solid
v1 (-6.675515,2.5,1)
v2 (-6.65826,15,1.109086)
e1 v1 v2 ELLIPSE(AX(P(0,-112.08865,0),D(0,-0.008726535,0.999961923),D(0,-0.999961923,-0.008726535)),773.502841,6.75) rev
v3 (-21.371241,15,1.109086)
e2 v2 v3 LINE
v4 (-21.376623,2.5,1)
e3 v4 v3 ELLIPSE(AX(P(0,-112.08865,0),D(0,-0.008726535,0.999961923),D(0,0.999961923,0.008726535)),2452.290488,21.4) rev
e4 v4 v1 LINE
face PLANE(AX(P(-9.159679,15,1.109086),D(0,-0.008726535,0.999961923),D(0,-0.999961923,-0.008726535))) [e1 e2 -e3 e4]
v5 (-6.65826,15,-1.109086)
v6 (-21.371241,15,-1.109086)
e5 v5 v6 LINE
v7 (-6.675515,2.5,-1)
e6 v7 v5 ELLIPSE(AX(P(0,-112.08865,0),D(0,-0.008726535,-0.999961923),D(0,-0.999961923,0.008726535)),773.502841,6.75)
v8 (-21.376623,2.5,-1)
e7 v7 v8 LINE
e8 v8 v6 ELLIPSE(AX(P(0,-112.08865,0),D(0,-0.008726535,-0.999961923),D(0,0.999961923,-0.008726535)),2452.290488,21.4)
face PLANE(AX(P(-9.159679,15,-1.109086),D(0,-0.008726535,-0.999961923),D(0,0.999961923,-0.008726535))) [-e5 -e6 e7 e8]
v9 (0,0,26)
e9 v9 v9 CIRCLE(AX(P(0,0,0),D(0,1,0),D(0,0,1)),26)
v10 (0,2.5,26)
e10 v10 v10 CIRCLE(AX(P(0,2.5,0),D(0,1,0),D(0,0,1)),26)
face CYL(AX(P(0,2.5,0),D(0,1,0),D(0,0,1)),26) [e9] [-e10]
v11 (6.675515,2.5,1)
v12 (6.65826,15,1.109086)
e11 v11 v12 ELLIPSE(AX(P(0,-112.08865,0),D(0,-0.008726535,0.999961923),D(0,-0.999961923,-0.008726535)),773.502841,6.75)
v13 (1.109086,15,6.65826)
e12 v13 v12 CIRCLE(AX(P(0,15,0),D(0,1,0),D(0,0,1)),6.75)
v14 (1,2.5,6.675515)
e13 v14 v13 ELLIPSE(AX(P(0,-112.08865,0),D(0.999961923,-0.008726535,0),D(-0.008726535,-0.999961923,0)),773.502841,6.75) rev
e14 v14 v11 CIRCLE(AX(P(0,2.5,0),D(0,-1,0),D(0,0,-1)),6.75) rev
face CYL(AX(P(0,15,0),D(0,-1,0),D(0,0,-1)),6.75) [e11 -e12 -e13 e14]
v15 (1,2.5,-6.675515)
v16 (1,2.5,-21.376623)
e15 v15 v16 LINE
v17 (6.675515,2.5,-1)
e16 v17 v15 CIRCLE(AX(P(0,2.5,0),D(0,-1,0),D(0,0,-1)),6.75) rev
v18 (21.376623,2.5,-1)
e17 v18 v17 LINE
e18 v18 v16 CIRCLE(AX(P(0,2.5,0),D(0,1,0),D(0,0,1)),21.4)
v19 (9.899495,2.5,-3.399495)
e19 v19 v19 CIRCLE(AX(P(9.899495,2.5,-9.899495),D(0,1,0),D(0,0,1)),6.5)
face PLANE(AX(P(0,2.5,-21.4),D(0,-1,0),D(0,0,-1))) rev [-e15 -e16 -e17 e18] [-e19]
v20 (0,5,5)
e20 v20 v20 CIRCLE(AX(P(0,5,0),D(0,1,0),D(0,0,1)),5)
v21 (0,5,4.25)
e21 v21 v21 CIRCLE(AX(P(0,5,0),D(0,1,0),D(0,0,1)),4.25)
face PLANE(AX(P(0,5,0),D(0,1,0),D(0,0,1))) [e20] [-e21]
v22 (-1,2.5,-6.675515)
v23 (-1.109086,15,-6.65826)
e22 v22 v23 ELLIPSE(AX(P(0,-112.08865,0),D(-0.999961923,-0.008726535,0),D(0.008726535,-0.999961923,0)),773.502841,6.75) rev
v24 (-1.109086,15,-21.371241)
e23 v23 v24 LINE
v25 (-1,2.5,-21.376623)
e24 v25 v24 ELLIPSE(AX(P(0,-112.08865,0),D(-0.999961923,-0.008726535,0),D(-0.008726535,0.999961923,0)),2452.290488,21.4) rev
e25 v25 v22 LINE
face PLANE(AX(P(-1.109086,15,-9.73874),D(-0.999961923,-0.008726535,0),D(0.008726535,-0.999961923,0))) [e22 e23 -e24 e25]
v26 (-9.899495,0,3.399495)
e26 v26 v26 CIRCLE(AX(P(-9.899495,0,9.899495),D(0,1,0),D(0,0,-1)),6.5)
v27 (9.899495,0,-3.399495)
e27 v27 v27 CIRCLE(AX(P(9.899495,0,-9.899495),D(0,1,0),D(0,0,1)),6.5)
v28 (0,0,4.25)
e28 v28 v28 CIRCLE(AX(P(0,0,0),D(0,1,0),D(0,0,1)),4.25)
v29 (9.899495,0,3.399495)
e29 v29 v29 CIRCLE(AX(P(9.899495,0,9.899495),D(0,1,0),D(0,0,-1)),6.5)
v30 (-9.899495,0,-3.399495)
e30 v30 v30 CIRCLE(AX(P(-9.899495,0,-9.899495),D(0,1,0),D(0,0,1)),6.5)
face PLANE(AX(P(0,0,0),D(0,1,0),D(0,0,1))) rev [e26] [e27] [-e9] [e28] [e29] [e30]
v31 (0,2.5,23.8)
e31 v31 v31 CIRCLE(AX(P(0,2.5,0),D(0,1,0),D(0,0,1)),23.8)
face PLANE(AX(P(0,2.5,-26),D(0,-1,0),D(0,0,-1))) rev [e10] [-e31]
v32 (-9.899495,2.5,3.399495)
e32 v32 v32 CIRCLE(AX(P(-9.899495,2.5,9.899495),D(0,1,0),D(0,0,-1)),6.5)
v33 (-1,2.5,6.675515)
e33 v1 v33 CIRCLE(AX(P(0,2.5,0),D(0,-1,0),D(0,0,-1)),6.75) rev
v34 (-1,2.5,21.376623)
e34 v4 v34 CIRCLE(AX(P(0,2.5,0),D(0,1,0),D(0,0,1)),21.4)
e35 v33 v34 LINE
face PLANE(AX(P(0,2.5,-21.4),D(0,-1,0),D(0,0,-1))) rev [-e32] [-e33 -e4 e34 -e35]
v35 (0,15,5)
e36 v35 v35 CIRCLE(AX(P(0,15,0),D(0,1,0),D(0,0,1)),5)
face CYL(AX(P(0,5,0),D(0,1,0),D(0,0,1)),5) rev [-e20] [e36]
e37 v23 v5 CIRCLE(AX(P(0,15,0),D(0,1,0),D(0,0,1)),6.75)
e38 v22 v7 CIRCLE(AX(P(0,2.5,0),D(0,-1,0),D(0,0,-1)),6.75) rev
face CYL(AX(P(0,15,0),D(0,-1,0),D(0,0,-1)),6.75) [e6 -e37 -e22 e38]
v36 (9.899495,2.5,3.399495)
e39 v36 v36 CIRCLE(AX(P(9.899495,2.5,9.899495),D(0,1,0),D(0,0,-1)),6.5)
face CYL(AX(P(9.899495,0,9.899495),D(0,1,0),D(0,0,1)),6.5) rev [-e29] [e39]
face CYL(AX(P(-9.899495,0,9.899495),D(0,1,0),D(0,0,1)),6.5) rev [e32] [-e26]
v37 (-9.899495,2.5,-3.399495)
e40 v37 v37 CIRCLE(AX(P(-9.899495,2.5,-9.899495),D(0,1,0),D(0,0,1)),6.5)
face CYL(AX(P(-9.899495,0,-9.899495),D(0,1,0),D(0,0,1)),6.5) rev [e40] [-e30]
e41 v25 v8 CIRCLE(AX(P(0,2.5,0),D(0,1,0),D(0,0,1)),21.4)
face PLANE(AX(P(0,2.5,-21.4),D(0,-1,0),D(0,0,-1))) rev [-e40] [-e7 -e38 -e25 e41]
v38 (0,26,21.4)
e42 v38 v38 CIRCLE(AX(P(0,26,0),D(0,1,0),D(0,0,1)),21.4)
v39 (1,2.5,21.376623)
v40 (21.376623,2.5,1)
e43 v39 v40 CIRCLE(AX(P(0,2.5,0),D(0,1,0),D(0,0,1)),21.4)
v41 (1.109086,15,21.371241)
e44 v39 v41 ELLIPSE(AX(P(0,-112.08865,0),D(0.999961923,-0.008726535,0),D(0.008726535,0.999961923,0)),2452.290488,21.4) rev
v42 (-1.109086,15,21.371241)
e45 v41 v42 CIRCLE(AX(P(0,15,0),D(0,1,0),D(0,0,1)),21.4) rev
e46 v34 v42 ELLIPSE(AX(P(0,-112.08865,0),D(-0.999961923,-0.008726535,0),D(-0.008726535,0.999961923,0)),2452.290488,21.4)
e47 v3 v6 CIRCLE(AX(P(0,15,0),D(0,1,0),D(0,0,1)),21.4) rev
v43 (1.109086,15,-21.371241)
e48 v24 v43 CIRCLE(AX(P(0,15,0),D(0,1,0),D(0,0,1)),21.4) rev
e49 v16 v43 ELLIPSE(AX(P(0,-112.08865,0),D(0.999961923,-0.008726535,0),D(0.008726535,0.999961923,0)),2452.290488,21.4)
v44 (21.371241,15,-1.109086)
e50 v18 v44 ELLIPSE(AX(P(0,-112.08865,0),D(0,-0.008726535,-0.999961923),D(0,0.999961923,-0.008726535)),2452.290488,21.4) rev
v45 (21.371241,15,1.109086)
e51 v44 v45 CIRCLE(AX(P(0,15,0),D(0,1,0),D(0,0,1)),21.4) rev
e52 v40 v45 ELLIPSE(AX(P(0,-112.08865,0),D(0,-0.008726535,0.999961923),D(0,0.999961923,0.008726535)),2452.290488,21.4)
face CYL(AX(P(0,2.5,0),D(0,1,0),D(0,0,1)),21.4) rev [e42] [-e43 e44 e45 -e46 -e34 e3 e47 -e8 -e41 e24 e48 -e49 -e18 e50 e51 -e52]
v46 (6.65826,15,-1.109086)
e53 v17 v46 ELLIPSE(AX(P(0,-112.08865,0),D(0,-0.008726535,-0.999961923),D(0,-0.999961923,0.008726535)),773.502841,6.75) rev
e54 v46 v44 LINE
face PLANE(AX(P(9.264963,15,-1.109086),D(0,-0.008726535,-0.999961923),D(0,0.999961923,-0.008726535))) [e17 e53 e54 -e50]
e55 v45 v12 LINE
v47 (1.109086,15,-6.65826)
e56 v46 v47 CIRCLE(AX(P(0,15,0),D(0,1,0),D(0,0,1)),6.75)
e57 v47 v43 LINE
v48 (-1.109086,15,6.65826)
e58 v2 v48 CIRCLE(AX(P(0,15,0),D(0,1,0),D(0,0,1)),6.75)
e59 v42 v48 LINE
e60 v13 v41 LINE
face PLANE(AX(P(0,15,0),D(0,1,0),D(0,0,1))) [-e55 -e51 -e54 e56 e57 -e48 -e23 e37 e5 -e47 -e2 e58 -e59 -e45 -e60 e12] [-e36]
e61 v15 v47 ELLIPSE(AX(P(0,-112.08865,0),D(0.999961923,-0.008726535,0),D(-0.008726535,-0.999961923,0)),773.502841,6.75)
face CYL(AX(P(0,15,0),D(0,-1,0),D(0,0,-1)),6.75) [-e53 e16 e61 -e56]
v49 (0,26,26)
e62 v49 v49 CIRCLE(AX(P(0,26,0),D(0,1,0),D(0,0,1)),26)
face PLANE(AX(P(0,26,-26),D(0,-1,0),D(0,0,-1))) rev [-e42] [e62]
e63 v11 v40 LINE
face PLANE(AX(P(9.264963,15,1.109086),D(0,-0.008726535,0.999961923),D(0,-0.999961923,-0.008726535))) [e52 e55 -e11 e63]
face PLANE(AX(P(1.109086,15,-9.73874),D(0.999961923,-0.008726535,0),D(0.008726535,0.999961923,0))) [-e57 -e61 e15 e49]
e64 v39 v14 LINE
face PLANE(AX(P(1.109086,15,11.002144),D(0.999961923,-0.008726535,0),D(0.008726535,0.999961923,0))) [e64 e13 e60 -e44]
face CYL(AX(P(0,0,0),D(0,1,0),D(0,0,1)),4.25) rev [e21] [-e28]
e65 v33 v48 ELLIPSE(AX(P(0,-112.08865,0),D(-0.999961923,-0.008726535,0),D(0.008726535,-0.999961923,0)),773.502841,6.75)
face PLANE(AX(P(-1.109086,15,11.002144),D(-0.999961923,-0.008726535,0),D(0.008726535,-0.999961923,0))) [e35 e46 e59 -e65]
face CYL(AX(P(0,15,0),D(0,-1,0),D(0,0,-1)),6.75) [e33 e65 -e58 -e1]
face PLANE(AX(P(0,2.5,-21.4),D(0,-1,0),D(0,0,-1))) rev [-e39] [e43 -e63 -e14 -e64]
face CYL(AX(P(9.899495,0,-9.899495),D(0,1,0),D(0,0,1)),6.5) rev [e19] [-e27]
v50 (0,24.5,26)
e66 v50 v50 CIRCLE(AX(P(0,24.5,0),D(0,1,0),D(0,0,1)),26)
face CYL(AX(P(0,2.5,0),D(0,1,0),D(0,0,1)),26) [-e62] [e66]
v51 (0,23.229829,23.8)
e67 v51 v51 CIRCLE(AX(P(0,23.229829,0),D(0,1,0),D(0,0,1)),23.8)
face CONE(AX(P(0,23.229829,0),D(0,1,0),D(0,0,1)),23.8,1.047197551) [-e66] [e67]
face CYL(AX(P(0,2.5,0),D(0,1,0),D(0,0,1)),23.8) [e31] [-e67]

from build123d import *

# Parameters (mm, degrees)
SKETCH3_R           = 6.75
BOSS_EXTRUDE1_DEPTH = 12.5
SKETCH4_R           = 5
CUT_EXTRUDE1_DEPTH  = 10
SKETCH5_R           = 4.25
CUT_EXTRUDE2_DEPTH  = 43.343830719
RIB1_START          = -22
RIB1_DEPTH          = 15.341739823
RIB1_START_2        = 6.658260177
RIB1_2_DEPTH        = 15.341739823
RIB1_3_DEPTH        = 15.341739823
RIB1_4_DEPTH        = 15.341739823
SKETCH9_R           = 6.5
CUT_EXTRUDE3_DEPTH  = 44.637713047


with BuildPart() as part:
    # Sketch2 → Revolve1 (revolve)
    with BuildSketch(Plane(origin=(0, 0, 0), x_dir=(0, 0, -1), z_dir=(1, 0, 0)), mode=Mode.PRIVATE) as revolve1_sk:
        Polygon((0, 0), (26, 0), (26, 2.5), (23.8, 2.5), (23.8, 23.229829408), (26, 24.5), (26, 26), (21.4, 26), (21.4, 2.5), (0, 2.5), align=None)
    revolve(revolve1_sk.sketch.rotate(Axis((0, 2.5, 0), (0, -1, 0)), 180), axis=Axis((0, 2.5, 0), (0, -1, 0)))

    # Sketch3 → Boss-Extrude1 (add)
    with BuildSketch(Plane(origin=(0, 2.5, 0), x_dir=(1, 0, 0), z_dir=(0, 1, 0))):
        with Locations(Location((0, 0, 0), (0, 0, 90))):
            Circle(SKETCH3_R)
    extrude(amount=BOSS_EXTRUDE1_DEPTH)

    # Sketch4 → Cut-Extrude1 (cut)
    with BuildSketch(Plane(origin=(0, 15, 0), x_dir=(1, 0, 0), z_dir=(0, 1, 0))):
        with Locations(Location((0, 0, 0), (0, 0, 270))):
            Circle(SKETCH4_R)
    extrude(amount=-CUT_EXTRUDE1_DEPTH, mode=Mode.SUBTRACT)

    # Sketch5 → Cut-Extrude2 (cut, through all)
    with BuildSketch(Plane(origin=(0, 5, 0), x_dir=(1, 0, 0), z_dir=(0, 1, 0))):
        with Locations(Location((0, 0, 0), (0, 0, 270))):
            Circle(SKETCH5_R)
    extrude(amount=-CUT_EXTRUDE2_DEPTH, mode=Mode.SUBTRACT)

    # Rib1: read off the stored shape, not the designer's step
    # Rib1 outline → Rib1 (add)
    with BuildSketch(Plane.XY.offset(RIB1_START)):
        Polygon((1, 2.5), (1.109085847, 15), (-1.109085847, 15), (-1, 2.5), align=None)
    extrude(amount=RIB1_DEPTH)

    # Rib1 2 outline → Rib1 2 (add)
    with BuildSketch(Plane.XY.offset(RIB1_START_2)):
        Polygon((1, 2.5), (1.109085847, 15), (-1.109085847, 15), (-1, 2.5), align=None)
    extrude(amount=RIB1_2_DEPTH)

    # Rib1 3 outline → Rib1 3 (add)
    with BuildSketch(Plane.YZ.offset(RIB1_START)):
        Polygon((2.5, -1), (15, -1.109085847), (15, 1.109085847), (2.5, 1), align=None)
    extrude(amount=RIB1_3_DEPTH)

    # Rib1 4 outline → Rib1 4 (add)
    with BuildSketch(Plane.YZ.offset(RIB1_START_2)):
        Polygon((2.5, -1), (15, -1.109085847), (15, 1.109085847), (2.5, 1), align=None)
    extrude(amount=RIB1_4_DEPTH)

    # Sketch9 → Cut-Extrude3 (cut, through all)
    with BuildSketch(Plane(origin=(0, 2.5, 0), x_dir=(1, 0, 0), z_dir=(0, 1, 0))):
        with Locations(Location((-9.899494937, 9.899494937, 0), (0, 0, 270))):
            Circle(SKETCH9_R)
        with Locations(Location((9.899494937, -9.899494937, 0), (0, 0, 90))):
            Circle(SKETCH9_R)
        with Locations(Location((9.899494937, 9.899494937, 0), (0, 0, 270))):
            Circle(SKETCH9_R)
        with Locations(Location((-9.899494937, -9.899494937, 0), (0, 0, 90))):
            Circle(SKETCH9_R)
    extrude(amount=-CUT_EXTRUDE3_DEPTH, mode=Mode.SUBTRACT)


solid = part.part
